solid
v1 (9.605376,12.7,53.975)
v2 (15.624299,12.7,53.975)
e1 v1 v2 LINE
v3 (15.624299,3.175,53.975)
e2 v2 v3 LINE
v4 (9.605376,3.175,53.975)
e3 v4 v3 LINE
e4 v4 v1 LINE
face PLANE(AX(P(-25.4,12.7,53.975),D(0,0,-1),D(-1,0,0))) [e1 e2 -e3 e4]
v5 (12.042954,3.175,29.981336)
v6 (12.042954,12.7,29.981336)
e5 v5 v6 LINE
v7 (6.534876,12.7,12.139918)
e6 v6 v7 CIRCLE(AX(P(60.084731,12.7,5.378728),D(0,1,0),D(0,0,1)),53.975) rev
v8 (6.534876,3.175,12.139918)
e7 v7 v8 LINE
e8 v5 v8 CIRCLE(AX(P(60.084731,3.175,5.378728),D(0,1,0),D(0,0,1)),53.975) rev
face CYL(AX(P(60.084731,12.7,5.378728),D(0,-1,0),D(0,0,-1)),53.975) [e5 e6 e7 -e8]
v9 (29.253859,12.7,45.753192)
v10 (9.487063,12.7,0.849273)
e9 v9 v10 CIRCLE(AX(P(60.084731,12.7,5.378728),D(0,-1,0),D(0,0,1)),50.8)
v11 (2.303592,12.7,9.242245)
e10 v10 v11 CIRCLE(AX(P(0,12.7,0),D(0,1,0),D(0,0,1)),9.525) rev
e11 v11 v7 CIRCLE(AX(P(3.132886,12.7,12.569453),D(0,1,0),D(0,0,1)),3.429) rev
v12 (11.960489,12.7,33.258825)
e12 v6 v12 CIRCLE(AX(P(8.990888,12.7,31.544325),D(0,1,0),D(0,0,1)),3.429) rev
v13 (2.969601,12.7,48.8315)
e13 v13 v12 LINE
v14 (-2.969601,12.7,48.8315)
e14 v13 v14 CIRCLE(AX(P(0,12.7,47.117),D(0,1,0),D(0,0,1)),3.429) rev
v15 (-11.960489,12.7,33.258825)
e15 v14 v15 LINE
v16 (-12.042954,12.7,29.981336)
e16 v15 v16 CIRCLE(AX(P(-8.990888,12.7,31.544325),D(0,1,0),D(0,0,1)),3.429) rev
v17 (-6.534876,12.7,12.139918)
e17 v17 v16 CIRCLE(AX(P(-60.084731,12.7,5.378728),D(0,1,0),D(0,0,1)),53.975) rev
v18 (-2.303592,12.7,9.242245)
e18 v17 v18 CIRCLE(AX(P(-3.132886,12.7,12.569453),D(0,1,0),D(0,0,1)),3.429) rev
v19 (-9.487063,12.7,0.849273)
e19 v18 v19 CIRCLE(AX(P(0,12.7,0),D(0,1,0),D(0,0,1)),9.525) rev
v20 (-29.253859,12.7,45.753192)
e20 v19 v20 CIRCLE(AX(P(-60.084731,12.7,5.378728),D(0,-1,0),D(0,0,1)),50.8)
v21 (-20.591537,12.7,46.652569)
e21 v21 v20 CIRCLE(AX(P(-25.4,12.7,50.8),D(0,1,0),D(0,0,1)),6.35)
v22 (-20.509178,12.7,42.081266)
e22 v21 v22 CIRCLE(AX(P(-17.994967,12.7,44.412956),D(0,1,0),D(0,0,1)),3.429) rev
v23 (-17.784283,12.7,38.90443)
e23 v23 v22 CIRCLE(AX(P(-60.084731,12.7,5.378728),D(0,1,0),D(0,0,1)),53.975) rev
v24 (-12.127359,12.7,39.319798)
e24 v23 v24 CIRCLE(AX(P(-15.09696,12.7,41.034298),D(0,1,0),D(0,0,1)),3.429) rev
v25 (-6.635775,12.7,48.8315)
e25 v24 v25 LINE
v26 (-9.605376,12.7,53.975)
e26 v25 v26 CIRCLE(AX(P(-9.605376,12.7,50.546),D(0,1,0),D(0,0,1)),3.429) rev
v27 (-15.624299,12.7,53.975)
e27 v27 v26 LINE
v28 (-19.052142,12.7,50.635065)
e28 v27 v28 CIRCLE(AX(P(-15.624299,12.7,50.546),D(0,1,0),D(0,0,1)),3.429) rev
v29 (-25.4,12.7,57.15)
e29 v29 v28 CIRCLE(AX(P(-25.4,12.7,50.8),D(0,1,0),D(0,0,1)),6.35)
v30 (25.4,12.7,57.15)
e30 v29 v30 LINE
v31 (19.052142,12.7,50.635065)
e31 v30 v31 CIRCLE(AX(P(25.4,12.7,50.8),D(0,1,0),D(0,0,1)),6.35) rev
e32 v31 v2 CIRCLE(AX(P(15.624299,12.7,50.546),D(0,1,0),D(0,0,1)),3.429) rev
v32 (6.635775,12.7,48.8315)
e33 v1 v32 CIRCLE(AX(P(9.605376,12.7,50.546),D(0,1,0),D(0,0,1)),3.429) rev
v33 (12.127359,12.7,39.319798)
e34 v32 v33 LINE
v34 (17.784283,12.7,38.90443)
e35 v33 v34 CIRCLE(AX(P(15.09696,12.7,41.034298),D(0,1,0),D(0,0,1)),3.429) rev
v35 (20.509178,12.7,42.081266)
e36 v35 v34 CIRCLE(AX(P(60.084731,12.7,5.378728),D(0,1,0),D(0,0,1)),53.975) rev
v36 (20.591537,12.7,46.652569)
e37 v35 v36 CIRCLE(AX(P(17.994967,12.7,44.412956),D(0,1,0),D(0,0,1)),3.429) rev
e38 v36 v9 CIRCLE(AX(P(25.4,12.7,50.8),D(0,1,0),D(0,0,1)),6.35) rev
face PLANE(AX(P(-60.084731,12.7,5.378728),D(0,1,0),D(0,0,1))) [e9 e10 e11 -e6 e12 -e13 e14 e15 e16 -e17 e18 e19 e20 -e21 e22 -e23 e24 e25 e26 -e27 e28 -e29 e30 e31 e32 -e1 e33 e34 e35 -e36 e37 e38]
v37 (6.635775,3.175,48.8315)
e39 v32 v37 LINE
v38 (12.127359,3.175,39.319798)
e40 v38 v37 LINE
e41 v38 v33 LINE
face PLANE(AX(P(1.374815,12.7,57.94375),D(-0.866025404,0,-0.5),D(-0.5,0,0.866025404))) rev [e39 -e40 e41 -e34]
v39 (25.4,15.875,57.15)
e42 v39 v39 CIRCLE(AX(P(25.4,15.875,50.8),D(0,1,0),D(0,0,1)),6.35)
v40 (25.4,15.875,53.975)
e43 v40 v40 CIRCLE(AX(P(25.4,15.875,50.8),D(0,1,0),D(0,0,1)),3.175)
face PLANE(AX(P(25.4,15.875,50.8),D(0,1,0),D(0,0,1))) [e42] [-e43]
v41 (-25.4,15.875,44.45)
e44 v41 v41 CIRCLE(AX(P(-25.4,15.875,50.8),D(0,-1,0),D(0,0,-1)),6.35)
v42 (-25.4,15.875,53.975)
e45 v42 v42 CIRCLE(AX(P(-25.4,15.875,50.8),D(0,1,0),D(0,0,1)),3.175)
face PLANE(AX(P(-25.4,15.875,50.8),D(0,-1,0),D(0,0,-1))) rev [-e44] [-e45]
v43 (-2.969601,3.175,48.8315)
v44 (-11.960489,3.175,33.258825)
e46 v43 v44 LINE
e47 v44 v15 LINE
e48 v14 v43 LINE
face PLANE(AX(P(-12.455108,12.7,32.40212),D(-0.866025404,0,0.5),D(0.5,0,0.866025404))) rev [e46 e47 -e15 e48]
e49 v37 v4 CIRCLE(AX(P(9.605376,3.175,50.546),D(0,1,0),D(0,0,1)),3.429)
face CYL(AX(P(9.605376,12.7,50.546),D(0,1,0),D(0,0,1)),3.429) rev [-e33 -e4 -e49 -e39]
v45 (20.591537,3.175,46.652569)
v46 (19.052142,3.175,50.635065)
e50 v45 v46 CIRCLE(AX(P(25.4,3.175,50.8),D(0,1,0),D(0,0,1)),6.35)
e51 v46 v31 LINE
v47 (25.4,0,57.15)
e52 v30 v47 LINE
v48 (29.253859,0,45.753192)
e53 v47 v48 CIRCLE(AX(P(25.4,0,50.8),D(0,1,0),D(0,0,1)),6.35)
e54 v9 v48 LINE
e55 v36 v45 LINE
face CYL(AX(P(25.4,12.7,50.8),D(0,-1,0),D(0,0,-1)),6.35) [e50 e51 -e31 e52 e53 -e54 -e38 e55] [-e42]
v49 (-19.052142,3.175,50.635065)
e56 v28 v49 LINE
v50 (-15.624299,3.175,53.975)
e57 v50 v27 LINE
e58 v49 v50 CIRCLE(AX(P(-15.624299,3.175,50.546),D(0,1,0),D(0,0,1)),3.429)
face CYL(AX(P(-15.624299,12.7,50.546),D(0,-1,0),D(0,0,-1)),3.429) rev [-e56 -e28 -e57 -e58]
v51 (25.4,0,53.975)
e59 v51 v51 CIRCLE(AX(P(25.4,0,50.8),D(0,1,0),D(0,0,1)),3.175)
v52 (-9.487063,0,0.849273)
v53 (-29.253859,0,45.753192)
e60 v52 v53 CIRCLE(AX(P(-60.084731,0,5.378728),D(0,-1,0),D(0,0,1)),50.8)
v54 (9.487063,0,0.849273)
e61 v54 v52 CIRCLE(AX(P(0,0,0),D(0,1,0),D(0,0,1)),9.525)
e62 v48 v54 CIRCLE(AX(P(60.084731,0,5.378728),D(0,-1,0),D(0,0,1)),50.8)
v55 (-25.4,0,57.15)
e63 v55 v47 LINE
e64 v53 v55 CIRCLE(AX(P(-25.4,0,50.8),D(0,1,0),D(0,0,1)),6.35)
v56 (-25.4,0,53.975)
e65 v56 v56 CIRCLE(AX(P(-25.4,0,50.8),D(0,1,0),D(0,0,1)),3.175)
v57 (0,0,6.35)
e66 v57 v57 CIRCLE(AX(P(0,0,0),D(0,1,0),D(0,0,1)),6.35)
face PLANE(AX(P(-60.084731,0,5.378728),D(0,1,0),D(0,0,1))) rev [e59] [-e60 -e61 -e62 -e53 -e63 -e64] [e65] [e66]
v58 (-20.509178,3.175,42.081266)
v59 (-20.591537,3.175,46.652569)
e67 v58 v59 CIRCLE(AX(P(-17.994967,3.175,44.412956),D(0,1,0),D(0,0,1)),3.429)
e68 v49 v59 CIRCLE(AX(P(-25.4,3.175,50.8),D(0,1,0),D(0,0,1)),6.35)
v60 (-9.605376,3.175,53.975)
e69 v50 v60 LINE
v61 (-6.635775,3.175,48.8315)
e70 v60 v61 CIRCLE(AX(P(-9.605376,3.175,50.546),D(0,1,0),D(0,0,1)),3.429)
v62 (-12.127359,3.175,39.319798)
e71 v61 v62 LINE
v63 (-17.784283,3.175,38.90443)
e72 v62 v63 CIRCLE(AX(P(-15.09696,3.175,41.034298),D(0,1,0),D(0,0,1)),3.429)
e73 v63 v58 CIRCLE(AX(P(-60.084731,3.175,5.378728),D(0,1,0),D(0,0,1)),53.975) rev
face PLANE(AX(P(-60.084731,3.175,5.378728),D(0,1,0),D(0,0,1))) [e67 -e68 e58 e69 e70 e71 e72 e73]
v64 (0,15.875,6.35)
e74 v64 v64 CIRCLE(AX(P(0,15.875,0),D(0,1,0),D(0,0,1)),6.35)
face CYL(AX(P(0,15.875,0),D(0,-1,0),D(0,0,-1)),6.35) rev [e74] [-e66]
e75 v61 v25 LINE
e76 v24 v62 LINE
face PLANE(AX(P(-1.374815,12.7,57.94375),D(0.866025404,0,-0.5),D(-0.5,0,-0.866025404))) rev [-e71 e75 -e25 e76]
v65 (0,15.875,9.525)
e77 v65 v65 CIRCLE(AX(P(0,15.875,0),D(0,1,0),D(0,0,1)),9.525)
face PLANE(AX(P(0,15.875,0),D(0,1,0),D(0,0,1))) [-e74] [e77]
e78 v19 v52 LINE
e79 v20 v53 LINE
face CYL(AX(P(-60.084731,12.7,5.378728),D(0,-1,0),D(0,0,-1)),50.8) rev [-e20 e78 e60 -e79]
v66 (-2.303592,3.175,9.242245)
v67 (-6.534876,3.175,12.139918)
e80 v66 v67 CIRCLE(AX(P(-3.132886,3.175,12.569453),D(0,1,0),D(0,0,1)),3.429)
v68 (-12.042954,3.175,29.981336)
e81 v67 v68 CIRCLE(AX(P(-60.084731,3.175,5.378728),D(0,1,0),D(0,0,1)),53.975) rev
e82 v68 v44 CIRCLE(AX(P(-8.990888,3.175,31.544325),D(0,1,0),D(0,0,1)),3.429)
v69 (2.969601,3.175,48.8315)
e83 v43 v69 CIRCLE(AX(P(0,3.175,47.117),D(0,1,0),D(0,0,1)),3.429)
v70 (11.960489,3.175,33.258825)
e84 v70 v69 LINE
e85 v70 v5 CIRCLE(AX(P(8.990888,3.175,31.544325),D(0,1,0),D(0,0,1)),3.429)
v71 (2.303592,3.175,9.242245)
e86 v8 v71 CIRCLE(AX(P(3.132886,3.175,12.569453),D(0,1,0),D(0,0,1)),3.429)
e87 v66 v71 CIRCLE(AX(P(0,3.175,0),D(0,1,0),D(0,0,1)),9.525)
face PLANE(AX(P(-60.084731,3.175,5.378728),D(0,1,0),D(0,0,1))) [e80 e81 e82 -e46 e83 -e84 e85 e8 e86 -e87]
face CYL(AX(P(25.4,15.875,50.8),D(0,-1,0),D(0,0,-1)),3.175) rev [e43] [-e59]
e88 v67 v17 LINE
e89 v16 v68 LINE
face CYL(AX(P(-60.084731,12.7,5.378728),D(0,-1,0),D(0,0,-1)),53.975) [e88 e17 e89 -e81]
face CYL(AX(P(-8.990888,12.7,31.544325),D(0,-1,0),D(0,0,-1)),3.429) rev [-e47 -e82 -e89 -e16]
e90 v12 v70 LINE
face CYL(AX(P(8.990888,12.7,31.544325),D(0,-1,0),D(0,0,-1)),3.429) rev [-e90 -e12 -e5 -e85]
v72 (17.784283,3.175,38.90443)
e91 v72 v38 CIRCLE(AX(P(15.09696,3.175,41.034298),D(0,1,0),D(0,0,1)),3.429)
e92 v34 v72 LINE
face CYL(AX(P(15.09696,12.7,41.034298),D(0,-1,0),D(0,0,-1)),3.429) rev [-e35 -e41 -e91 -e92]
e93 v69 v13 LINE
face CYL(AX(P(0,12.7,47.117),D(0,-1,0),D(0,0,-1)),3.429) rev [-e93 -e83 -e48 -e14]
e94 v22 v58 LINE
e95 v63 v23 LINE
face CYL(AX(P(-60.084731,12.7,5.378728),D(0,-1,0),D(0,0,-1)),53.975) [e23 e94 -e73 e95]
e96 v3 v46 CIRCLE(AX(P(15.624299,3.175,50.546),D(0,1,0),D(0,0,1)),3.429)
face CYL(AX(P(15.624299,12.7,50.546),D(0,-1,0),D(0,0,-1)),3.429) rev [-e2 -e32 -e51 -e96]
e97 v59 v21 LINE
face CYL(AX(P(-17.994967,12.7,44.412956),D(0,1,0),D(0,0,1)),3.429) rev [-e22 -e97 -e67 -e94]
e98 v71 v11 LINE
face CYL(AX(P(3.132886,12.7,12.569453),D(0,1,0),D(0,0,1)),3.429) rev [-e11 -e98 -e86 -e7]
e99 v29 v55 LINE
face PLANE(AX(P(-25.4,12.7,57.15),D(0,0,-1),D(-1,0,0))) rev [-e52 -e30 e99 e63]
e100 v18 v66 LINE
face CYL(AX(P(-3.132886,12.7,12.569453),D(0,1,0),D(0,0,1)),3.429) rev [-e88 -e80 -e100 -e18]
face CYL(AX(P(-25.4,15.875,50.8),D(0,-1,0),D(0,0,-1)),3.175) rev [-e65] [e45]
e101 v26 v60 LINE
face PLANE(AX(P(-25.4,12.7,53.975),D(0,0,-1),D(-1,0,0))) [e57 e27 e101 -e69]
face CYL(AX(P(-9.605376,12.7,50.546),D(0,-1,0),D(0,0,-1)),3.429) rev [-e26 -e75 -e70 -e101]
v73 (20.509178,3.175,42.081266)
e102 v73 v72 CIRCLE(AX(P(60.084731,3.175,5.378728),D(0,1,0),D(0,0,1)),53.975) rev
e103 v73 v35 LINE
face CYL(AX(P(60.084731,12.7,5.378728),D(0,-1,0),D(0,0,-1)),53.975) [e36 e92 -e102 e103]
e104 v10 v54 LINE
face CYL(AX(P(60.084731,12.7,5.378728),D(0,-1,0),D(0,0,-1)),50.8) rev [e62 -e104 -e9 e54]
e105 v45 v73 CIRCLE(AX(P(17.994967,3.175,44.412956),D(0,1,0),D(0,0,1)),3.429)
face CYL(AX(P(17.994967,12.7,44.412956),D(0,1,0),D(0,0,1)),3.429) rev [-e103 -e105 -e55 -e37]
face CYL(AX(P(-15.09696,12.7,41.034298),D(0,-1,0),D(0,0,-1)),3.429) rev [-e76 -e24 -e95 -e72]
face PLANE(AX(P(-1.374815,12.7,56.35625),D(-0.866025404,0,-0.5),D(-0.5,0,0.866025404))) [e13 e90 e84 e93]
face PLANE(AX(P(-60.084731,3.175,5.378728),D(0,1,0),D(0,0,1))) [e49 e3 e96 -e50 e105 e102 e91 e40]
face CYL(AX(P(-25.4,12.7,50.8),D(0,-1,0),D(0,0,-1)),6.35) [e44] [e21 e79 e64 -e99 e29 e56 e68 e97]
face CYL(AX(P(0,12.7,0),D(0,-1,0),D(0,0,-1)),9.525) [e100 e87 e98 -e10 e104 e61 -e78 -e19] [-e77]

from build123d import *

# Parameters (mm, degrees)
BOSS_EXTRUDE1_DEPTH = 12.7
OUTSIDE_CIRLCES_R   = 9.525
OUTSIDE_CIRLCES_R_2 = 6.35
BOSS_EXTRUDE2_DEPTH = 15.875
SKETCH2_R           = 6.35
SKETCH2_R_2         = 3.175
CUT_EXTRUDE2_DEPTH  = 68.277043819
SHELL1_START        = 3.175
SHELL1_DEPTH        = 9.525
RIB1_START          = -9.525
RIB1_DEPTH          = 9.525
FILLET1_R           = 3.429


# Read off the part's stored shape, not the designer's step: Shell1, Rib1
with BuildPart() as part:
    # Sketch1 → Boss-Extrude1 (new body)
    with BuildSketch(Plane(origin=(0, 0, 0), x_dir=(1, 0, 0), z_dir=(0, 1, 0))):
        with BuildLine():
            Line((-25.4, -57.15), (25.4, -57.15))
            ThreePointArc((25.4, -57.15), (31.415385717, -52.834117665), (29.253859008, -45.753192024))
            ThreePointArc((29.253859008, -45.753192024), (13.590190704, -25.845719106), (9.487062801, -0.849272876))
            ThreePointArc((9.487062801, -0.849272876), (0, 9.525), (-9.487062801, -0.849272876))
            ThreePointArc((-9.487062801, -0.849272876), (-13.590190704, -25.845719106), (-29.253859008, -45.753192024))
            ThreePointArc((-29.253859008, -45.753192024), (-31.415385717, -52.834117665), (-25.4, -57.15))
        make_face()
    extrude(amount=BOSS_EXTRUDE1_DEPTH)

    # Outside Cirlces → Boss-Extrude2 (add)
    with BuildSketch(Plane(origin=(0, 0, 0), x_dir=(1, 0, 0), z_dir=(0, 1, 0))):
        with Locations(Location((0, 0, 0), (0, 0, 354.884571445))):
            Circle(OUTSIDE_CIRLCES_R)
        with Locations(Location((25.4, -50.8, 0), (0, 0, 270))):
            Circle(OUTSIDE_CIRLCES_R_2)
        with Locations(Location((-25.4, -50.8, 0), (0, 0, 90))):
            Circle(OUTSIDE_CIRLCES_R_2)
    extrude(amount=BOSS_EXTRUDE2_DEPTH)

    # Sketch2 → Cut-Extrude2 (cut, through all)
    with BuildSketch(Plane(origin=(0, 0, 0), x_dir=(1, 0, 0), z_dir=(0, 1, 0))):
        with Locations(Location((0, 0, 0), (0, 0, 270))):
            Circle(SKETCH2_R)
        with Locations(Location((-25.4, -50.8, 0), (0, 0, 270))):
            Circle(SKETCH2_R_2)
        with Locations(Location((25.4, -50.8, 0), (0, 0, 270))):
            Circle(SKETCH2_R_2)
    extrude(amount=CUT_EXTRUDE2_DEPTH, mode=Mode.SUBTRACT)

    # Shell1 outline → Shell1 (cut)
    with BuildSketch(Plane(origin=(0, 0, 0), x_dir=(1, 0, 0), z_dir=(0, 1, 0)).offset(SHELL1_START)):
        with BuildLine():
            ThreePointArc((-23.245193613, -44.826783996), (-19.436053982, -48.61966794), (-19.900738686, -53.975))
            Line((-19.900738686, -53.975), (19.900738686, -53.975))
            ThreePointArc((19.900738686, -53.975), (19.436053982, -48.61966794), (23.245193613, -44.826783996))
            ThreePointArc((23.245193613, -44.826783996), (10.964919098, -27.751584466), (6.1431994, -7.279198179))
            ThreePointArc((6.1431994, -7.279198179), (0, -9.525), (-6.1431994, -7.279198179))
            ThreePointArc((-6.1431994, -7.279198179), (-10.964919098, -27.751584466), (-23.245193613, -44.826783996))
        make_face()
    extrude(amount=SHELL1_DEPTH, mode=Mode.SUBTRACT)

    # Rib1 outline → Rib1 (add)
    with BuildSketch(Plane(origin=(0, 12.7, 0), x_dir=(1, 0, 0), z_dir=(0, 1, 0)).offset(RIB1_START)):
        with BuildLine():
            Line((12.912461206, -31.609961141), (0, -53.975))
            Line((0, -53.975), (3.666174209, -53.975))
            Line((3.666174209, -53.975), (14.782281631, -34.721337162))
            ThreePointArc((14.782281631, -34.721337162), (13.82120772, -33.181372554), (12.912461206, -31.609961141))
        make_face()
        with BuildLine():
            Line((0, -53.975), (-12.912461206, -31.609961141))
            ThreePointArc((-12.912461206, -31.609961141), (-13.82120772, -33.181372554), (-14.782281631, -34.721337162))
            Line((-14.782281631, -34.721337162), (-3.666174209, -53.975))
            Line((-3.666174209, -53.975), (0, -53.975))
        make_face()
    extrude(amount=RIB1_DEPTH)

    # Fillet1
    fillet1_edges = [part.edges().sort_by_distance(p)[0] for p in [
        (-12.912461206, 7.9375, 31.609961141),
        (-3.666174209, 7.9375, 53.975),
        (-14.782281631, 7.9375, 34.721337162),
        (14.782281631, 7.9375, 34.721337162),
        (3.666174209, 7.9375, 53.975),
        (0, 7.9375, 53.975),
        (12.912461206, 7.9375, 31.609961141),
        (-6.1431994, 7.9375, 7.279198179),
        (-19.900738686, 7.9375, 53.975),
        (23.245193613, 7.9375, 44.826783996),
        (6.1431994, 7.9375, 7.279198179),
        (-23.245193613, 7.9375, 44.826783996),
        (19.900738686, 7.9375, 53.975),
    ]]
    fillet(fillet1_edges, radius=FILLET1_R)


solid = part.part
